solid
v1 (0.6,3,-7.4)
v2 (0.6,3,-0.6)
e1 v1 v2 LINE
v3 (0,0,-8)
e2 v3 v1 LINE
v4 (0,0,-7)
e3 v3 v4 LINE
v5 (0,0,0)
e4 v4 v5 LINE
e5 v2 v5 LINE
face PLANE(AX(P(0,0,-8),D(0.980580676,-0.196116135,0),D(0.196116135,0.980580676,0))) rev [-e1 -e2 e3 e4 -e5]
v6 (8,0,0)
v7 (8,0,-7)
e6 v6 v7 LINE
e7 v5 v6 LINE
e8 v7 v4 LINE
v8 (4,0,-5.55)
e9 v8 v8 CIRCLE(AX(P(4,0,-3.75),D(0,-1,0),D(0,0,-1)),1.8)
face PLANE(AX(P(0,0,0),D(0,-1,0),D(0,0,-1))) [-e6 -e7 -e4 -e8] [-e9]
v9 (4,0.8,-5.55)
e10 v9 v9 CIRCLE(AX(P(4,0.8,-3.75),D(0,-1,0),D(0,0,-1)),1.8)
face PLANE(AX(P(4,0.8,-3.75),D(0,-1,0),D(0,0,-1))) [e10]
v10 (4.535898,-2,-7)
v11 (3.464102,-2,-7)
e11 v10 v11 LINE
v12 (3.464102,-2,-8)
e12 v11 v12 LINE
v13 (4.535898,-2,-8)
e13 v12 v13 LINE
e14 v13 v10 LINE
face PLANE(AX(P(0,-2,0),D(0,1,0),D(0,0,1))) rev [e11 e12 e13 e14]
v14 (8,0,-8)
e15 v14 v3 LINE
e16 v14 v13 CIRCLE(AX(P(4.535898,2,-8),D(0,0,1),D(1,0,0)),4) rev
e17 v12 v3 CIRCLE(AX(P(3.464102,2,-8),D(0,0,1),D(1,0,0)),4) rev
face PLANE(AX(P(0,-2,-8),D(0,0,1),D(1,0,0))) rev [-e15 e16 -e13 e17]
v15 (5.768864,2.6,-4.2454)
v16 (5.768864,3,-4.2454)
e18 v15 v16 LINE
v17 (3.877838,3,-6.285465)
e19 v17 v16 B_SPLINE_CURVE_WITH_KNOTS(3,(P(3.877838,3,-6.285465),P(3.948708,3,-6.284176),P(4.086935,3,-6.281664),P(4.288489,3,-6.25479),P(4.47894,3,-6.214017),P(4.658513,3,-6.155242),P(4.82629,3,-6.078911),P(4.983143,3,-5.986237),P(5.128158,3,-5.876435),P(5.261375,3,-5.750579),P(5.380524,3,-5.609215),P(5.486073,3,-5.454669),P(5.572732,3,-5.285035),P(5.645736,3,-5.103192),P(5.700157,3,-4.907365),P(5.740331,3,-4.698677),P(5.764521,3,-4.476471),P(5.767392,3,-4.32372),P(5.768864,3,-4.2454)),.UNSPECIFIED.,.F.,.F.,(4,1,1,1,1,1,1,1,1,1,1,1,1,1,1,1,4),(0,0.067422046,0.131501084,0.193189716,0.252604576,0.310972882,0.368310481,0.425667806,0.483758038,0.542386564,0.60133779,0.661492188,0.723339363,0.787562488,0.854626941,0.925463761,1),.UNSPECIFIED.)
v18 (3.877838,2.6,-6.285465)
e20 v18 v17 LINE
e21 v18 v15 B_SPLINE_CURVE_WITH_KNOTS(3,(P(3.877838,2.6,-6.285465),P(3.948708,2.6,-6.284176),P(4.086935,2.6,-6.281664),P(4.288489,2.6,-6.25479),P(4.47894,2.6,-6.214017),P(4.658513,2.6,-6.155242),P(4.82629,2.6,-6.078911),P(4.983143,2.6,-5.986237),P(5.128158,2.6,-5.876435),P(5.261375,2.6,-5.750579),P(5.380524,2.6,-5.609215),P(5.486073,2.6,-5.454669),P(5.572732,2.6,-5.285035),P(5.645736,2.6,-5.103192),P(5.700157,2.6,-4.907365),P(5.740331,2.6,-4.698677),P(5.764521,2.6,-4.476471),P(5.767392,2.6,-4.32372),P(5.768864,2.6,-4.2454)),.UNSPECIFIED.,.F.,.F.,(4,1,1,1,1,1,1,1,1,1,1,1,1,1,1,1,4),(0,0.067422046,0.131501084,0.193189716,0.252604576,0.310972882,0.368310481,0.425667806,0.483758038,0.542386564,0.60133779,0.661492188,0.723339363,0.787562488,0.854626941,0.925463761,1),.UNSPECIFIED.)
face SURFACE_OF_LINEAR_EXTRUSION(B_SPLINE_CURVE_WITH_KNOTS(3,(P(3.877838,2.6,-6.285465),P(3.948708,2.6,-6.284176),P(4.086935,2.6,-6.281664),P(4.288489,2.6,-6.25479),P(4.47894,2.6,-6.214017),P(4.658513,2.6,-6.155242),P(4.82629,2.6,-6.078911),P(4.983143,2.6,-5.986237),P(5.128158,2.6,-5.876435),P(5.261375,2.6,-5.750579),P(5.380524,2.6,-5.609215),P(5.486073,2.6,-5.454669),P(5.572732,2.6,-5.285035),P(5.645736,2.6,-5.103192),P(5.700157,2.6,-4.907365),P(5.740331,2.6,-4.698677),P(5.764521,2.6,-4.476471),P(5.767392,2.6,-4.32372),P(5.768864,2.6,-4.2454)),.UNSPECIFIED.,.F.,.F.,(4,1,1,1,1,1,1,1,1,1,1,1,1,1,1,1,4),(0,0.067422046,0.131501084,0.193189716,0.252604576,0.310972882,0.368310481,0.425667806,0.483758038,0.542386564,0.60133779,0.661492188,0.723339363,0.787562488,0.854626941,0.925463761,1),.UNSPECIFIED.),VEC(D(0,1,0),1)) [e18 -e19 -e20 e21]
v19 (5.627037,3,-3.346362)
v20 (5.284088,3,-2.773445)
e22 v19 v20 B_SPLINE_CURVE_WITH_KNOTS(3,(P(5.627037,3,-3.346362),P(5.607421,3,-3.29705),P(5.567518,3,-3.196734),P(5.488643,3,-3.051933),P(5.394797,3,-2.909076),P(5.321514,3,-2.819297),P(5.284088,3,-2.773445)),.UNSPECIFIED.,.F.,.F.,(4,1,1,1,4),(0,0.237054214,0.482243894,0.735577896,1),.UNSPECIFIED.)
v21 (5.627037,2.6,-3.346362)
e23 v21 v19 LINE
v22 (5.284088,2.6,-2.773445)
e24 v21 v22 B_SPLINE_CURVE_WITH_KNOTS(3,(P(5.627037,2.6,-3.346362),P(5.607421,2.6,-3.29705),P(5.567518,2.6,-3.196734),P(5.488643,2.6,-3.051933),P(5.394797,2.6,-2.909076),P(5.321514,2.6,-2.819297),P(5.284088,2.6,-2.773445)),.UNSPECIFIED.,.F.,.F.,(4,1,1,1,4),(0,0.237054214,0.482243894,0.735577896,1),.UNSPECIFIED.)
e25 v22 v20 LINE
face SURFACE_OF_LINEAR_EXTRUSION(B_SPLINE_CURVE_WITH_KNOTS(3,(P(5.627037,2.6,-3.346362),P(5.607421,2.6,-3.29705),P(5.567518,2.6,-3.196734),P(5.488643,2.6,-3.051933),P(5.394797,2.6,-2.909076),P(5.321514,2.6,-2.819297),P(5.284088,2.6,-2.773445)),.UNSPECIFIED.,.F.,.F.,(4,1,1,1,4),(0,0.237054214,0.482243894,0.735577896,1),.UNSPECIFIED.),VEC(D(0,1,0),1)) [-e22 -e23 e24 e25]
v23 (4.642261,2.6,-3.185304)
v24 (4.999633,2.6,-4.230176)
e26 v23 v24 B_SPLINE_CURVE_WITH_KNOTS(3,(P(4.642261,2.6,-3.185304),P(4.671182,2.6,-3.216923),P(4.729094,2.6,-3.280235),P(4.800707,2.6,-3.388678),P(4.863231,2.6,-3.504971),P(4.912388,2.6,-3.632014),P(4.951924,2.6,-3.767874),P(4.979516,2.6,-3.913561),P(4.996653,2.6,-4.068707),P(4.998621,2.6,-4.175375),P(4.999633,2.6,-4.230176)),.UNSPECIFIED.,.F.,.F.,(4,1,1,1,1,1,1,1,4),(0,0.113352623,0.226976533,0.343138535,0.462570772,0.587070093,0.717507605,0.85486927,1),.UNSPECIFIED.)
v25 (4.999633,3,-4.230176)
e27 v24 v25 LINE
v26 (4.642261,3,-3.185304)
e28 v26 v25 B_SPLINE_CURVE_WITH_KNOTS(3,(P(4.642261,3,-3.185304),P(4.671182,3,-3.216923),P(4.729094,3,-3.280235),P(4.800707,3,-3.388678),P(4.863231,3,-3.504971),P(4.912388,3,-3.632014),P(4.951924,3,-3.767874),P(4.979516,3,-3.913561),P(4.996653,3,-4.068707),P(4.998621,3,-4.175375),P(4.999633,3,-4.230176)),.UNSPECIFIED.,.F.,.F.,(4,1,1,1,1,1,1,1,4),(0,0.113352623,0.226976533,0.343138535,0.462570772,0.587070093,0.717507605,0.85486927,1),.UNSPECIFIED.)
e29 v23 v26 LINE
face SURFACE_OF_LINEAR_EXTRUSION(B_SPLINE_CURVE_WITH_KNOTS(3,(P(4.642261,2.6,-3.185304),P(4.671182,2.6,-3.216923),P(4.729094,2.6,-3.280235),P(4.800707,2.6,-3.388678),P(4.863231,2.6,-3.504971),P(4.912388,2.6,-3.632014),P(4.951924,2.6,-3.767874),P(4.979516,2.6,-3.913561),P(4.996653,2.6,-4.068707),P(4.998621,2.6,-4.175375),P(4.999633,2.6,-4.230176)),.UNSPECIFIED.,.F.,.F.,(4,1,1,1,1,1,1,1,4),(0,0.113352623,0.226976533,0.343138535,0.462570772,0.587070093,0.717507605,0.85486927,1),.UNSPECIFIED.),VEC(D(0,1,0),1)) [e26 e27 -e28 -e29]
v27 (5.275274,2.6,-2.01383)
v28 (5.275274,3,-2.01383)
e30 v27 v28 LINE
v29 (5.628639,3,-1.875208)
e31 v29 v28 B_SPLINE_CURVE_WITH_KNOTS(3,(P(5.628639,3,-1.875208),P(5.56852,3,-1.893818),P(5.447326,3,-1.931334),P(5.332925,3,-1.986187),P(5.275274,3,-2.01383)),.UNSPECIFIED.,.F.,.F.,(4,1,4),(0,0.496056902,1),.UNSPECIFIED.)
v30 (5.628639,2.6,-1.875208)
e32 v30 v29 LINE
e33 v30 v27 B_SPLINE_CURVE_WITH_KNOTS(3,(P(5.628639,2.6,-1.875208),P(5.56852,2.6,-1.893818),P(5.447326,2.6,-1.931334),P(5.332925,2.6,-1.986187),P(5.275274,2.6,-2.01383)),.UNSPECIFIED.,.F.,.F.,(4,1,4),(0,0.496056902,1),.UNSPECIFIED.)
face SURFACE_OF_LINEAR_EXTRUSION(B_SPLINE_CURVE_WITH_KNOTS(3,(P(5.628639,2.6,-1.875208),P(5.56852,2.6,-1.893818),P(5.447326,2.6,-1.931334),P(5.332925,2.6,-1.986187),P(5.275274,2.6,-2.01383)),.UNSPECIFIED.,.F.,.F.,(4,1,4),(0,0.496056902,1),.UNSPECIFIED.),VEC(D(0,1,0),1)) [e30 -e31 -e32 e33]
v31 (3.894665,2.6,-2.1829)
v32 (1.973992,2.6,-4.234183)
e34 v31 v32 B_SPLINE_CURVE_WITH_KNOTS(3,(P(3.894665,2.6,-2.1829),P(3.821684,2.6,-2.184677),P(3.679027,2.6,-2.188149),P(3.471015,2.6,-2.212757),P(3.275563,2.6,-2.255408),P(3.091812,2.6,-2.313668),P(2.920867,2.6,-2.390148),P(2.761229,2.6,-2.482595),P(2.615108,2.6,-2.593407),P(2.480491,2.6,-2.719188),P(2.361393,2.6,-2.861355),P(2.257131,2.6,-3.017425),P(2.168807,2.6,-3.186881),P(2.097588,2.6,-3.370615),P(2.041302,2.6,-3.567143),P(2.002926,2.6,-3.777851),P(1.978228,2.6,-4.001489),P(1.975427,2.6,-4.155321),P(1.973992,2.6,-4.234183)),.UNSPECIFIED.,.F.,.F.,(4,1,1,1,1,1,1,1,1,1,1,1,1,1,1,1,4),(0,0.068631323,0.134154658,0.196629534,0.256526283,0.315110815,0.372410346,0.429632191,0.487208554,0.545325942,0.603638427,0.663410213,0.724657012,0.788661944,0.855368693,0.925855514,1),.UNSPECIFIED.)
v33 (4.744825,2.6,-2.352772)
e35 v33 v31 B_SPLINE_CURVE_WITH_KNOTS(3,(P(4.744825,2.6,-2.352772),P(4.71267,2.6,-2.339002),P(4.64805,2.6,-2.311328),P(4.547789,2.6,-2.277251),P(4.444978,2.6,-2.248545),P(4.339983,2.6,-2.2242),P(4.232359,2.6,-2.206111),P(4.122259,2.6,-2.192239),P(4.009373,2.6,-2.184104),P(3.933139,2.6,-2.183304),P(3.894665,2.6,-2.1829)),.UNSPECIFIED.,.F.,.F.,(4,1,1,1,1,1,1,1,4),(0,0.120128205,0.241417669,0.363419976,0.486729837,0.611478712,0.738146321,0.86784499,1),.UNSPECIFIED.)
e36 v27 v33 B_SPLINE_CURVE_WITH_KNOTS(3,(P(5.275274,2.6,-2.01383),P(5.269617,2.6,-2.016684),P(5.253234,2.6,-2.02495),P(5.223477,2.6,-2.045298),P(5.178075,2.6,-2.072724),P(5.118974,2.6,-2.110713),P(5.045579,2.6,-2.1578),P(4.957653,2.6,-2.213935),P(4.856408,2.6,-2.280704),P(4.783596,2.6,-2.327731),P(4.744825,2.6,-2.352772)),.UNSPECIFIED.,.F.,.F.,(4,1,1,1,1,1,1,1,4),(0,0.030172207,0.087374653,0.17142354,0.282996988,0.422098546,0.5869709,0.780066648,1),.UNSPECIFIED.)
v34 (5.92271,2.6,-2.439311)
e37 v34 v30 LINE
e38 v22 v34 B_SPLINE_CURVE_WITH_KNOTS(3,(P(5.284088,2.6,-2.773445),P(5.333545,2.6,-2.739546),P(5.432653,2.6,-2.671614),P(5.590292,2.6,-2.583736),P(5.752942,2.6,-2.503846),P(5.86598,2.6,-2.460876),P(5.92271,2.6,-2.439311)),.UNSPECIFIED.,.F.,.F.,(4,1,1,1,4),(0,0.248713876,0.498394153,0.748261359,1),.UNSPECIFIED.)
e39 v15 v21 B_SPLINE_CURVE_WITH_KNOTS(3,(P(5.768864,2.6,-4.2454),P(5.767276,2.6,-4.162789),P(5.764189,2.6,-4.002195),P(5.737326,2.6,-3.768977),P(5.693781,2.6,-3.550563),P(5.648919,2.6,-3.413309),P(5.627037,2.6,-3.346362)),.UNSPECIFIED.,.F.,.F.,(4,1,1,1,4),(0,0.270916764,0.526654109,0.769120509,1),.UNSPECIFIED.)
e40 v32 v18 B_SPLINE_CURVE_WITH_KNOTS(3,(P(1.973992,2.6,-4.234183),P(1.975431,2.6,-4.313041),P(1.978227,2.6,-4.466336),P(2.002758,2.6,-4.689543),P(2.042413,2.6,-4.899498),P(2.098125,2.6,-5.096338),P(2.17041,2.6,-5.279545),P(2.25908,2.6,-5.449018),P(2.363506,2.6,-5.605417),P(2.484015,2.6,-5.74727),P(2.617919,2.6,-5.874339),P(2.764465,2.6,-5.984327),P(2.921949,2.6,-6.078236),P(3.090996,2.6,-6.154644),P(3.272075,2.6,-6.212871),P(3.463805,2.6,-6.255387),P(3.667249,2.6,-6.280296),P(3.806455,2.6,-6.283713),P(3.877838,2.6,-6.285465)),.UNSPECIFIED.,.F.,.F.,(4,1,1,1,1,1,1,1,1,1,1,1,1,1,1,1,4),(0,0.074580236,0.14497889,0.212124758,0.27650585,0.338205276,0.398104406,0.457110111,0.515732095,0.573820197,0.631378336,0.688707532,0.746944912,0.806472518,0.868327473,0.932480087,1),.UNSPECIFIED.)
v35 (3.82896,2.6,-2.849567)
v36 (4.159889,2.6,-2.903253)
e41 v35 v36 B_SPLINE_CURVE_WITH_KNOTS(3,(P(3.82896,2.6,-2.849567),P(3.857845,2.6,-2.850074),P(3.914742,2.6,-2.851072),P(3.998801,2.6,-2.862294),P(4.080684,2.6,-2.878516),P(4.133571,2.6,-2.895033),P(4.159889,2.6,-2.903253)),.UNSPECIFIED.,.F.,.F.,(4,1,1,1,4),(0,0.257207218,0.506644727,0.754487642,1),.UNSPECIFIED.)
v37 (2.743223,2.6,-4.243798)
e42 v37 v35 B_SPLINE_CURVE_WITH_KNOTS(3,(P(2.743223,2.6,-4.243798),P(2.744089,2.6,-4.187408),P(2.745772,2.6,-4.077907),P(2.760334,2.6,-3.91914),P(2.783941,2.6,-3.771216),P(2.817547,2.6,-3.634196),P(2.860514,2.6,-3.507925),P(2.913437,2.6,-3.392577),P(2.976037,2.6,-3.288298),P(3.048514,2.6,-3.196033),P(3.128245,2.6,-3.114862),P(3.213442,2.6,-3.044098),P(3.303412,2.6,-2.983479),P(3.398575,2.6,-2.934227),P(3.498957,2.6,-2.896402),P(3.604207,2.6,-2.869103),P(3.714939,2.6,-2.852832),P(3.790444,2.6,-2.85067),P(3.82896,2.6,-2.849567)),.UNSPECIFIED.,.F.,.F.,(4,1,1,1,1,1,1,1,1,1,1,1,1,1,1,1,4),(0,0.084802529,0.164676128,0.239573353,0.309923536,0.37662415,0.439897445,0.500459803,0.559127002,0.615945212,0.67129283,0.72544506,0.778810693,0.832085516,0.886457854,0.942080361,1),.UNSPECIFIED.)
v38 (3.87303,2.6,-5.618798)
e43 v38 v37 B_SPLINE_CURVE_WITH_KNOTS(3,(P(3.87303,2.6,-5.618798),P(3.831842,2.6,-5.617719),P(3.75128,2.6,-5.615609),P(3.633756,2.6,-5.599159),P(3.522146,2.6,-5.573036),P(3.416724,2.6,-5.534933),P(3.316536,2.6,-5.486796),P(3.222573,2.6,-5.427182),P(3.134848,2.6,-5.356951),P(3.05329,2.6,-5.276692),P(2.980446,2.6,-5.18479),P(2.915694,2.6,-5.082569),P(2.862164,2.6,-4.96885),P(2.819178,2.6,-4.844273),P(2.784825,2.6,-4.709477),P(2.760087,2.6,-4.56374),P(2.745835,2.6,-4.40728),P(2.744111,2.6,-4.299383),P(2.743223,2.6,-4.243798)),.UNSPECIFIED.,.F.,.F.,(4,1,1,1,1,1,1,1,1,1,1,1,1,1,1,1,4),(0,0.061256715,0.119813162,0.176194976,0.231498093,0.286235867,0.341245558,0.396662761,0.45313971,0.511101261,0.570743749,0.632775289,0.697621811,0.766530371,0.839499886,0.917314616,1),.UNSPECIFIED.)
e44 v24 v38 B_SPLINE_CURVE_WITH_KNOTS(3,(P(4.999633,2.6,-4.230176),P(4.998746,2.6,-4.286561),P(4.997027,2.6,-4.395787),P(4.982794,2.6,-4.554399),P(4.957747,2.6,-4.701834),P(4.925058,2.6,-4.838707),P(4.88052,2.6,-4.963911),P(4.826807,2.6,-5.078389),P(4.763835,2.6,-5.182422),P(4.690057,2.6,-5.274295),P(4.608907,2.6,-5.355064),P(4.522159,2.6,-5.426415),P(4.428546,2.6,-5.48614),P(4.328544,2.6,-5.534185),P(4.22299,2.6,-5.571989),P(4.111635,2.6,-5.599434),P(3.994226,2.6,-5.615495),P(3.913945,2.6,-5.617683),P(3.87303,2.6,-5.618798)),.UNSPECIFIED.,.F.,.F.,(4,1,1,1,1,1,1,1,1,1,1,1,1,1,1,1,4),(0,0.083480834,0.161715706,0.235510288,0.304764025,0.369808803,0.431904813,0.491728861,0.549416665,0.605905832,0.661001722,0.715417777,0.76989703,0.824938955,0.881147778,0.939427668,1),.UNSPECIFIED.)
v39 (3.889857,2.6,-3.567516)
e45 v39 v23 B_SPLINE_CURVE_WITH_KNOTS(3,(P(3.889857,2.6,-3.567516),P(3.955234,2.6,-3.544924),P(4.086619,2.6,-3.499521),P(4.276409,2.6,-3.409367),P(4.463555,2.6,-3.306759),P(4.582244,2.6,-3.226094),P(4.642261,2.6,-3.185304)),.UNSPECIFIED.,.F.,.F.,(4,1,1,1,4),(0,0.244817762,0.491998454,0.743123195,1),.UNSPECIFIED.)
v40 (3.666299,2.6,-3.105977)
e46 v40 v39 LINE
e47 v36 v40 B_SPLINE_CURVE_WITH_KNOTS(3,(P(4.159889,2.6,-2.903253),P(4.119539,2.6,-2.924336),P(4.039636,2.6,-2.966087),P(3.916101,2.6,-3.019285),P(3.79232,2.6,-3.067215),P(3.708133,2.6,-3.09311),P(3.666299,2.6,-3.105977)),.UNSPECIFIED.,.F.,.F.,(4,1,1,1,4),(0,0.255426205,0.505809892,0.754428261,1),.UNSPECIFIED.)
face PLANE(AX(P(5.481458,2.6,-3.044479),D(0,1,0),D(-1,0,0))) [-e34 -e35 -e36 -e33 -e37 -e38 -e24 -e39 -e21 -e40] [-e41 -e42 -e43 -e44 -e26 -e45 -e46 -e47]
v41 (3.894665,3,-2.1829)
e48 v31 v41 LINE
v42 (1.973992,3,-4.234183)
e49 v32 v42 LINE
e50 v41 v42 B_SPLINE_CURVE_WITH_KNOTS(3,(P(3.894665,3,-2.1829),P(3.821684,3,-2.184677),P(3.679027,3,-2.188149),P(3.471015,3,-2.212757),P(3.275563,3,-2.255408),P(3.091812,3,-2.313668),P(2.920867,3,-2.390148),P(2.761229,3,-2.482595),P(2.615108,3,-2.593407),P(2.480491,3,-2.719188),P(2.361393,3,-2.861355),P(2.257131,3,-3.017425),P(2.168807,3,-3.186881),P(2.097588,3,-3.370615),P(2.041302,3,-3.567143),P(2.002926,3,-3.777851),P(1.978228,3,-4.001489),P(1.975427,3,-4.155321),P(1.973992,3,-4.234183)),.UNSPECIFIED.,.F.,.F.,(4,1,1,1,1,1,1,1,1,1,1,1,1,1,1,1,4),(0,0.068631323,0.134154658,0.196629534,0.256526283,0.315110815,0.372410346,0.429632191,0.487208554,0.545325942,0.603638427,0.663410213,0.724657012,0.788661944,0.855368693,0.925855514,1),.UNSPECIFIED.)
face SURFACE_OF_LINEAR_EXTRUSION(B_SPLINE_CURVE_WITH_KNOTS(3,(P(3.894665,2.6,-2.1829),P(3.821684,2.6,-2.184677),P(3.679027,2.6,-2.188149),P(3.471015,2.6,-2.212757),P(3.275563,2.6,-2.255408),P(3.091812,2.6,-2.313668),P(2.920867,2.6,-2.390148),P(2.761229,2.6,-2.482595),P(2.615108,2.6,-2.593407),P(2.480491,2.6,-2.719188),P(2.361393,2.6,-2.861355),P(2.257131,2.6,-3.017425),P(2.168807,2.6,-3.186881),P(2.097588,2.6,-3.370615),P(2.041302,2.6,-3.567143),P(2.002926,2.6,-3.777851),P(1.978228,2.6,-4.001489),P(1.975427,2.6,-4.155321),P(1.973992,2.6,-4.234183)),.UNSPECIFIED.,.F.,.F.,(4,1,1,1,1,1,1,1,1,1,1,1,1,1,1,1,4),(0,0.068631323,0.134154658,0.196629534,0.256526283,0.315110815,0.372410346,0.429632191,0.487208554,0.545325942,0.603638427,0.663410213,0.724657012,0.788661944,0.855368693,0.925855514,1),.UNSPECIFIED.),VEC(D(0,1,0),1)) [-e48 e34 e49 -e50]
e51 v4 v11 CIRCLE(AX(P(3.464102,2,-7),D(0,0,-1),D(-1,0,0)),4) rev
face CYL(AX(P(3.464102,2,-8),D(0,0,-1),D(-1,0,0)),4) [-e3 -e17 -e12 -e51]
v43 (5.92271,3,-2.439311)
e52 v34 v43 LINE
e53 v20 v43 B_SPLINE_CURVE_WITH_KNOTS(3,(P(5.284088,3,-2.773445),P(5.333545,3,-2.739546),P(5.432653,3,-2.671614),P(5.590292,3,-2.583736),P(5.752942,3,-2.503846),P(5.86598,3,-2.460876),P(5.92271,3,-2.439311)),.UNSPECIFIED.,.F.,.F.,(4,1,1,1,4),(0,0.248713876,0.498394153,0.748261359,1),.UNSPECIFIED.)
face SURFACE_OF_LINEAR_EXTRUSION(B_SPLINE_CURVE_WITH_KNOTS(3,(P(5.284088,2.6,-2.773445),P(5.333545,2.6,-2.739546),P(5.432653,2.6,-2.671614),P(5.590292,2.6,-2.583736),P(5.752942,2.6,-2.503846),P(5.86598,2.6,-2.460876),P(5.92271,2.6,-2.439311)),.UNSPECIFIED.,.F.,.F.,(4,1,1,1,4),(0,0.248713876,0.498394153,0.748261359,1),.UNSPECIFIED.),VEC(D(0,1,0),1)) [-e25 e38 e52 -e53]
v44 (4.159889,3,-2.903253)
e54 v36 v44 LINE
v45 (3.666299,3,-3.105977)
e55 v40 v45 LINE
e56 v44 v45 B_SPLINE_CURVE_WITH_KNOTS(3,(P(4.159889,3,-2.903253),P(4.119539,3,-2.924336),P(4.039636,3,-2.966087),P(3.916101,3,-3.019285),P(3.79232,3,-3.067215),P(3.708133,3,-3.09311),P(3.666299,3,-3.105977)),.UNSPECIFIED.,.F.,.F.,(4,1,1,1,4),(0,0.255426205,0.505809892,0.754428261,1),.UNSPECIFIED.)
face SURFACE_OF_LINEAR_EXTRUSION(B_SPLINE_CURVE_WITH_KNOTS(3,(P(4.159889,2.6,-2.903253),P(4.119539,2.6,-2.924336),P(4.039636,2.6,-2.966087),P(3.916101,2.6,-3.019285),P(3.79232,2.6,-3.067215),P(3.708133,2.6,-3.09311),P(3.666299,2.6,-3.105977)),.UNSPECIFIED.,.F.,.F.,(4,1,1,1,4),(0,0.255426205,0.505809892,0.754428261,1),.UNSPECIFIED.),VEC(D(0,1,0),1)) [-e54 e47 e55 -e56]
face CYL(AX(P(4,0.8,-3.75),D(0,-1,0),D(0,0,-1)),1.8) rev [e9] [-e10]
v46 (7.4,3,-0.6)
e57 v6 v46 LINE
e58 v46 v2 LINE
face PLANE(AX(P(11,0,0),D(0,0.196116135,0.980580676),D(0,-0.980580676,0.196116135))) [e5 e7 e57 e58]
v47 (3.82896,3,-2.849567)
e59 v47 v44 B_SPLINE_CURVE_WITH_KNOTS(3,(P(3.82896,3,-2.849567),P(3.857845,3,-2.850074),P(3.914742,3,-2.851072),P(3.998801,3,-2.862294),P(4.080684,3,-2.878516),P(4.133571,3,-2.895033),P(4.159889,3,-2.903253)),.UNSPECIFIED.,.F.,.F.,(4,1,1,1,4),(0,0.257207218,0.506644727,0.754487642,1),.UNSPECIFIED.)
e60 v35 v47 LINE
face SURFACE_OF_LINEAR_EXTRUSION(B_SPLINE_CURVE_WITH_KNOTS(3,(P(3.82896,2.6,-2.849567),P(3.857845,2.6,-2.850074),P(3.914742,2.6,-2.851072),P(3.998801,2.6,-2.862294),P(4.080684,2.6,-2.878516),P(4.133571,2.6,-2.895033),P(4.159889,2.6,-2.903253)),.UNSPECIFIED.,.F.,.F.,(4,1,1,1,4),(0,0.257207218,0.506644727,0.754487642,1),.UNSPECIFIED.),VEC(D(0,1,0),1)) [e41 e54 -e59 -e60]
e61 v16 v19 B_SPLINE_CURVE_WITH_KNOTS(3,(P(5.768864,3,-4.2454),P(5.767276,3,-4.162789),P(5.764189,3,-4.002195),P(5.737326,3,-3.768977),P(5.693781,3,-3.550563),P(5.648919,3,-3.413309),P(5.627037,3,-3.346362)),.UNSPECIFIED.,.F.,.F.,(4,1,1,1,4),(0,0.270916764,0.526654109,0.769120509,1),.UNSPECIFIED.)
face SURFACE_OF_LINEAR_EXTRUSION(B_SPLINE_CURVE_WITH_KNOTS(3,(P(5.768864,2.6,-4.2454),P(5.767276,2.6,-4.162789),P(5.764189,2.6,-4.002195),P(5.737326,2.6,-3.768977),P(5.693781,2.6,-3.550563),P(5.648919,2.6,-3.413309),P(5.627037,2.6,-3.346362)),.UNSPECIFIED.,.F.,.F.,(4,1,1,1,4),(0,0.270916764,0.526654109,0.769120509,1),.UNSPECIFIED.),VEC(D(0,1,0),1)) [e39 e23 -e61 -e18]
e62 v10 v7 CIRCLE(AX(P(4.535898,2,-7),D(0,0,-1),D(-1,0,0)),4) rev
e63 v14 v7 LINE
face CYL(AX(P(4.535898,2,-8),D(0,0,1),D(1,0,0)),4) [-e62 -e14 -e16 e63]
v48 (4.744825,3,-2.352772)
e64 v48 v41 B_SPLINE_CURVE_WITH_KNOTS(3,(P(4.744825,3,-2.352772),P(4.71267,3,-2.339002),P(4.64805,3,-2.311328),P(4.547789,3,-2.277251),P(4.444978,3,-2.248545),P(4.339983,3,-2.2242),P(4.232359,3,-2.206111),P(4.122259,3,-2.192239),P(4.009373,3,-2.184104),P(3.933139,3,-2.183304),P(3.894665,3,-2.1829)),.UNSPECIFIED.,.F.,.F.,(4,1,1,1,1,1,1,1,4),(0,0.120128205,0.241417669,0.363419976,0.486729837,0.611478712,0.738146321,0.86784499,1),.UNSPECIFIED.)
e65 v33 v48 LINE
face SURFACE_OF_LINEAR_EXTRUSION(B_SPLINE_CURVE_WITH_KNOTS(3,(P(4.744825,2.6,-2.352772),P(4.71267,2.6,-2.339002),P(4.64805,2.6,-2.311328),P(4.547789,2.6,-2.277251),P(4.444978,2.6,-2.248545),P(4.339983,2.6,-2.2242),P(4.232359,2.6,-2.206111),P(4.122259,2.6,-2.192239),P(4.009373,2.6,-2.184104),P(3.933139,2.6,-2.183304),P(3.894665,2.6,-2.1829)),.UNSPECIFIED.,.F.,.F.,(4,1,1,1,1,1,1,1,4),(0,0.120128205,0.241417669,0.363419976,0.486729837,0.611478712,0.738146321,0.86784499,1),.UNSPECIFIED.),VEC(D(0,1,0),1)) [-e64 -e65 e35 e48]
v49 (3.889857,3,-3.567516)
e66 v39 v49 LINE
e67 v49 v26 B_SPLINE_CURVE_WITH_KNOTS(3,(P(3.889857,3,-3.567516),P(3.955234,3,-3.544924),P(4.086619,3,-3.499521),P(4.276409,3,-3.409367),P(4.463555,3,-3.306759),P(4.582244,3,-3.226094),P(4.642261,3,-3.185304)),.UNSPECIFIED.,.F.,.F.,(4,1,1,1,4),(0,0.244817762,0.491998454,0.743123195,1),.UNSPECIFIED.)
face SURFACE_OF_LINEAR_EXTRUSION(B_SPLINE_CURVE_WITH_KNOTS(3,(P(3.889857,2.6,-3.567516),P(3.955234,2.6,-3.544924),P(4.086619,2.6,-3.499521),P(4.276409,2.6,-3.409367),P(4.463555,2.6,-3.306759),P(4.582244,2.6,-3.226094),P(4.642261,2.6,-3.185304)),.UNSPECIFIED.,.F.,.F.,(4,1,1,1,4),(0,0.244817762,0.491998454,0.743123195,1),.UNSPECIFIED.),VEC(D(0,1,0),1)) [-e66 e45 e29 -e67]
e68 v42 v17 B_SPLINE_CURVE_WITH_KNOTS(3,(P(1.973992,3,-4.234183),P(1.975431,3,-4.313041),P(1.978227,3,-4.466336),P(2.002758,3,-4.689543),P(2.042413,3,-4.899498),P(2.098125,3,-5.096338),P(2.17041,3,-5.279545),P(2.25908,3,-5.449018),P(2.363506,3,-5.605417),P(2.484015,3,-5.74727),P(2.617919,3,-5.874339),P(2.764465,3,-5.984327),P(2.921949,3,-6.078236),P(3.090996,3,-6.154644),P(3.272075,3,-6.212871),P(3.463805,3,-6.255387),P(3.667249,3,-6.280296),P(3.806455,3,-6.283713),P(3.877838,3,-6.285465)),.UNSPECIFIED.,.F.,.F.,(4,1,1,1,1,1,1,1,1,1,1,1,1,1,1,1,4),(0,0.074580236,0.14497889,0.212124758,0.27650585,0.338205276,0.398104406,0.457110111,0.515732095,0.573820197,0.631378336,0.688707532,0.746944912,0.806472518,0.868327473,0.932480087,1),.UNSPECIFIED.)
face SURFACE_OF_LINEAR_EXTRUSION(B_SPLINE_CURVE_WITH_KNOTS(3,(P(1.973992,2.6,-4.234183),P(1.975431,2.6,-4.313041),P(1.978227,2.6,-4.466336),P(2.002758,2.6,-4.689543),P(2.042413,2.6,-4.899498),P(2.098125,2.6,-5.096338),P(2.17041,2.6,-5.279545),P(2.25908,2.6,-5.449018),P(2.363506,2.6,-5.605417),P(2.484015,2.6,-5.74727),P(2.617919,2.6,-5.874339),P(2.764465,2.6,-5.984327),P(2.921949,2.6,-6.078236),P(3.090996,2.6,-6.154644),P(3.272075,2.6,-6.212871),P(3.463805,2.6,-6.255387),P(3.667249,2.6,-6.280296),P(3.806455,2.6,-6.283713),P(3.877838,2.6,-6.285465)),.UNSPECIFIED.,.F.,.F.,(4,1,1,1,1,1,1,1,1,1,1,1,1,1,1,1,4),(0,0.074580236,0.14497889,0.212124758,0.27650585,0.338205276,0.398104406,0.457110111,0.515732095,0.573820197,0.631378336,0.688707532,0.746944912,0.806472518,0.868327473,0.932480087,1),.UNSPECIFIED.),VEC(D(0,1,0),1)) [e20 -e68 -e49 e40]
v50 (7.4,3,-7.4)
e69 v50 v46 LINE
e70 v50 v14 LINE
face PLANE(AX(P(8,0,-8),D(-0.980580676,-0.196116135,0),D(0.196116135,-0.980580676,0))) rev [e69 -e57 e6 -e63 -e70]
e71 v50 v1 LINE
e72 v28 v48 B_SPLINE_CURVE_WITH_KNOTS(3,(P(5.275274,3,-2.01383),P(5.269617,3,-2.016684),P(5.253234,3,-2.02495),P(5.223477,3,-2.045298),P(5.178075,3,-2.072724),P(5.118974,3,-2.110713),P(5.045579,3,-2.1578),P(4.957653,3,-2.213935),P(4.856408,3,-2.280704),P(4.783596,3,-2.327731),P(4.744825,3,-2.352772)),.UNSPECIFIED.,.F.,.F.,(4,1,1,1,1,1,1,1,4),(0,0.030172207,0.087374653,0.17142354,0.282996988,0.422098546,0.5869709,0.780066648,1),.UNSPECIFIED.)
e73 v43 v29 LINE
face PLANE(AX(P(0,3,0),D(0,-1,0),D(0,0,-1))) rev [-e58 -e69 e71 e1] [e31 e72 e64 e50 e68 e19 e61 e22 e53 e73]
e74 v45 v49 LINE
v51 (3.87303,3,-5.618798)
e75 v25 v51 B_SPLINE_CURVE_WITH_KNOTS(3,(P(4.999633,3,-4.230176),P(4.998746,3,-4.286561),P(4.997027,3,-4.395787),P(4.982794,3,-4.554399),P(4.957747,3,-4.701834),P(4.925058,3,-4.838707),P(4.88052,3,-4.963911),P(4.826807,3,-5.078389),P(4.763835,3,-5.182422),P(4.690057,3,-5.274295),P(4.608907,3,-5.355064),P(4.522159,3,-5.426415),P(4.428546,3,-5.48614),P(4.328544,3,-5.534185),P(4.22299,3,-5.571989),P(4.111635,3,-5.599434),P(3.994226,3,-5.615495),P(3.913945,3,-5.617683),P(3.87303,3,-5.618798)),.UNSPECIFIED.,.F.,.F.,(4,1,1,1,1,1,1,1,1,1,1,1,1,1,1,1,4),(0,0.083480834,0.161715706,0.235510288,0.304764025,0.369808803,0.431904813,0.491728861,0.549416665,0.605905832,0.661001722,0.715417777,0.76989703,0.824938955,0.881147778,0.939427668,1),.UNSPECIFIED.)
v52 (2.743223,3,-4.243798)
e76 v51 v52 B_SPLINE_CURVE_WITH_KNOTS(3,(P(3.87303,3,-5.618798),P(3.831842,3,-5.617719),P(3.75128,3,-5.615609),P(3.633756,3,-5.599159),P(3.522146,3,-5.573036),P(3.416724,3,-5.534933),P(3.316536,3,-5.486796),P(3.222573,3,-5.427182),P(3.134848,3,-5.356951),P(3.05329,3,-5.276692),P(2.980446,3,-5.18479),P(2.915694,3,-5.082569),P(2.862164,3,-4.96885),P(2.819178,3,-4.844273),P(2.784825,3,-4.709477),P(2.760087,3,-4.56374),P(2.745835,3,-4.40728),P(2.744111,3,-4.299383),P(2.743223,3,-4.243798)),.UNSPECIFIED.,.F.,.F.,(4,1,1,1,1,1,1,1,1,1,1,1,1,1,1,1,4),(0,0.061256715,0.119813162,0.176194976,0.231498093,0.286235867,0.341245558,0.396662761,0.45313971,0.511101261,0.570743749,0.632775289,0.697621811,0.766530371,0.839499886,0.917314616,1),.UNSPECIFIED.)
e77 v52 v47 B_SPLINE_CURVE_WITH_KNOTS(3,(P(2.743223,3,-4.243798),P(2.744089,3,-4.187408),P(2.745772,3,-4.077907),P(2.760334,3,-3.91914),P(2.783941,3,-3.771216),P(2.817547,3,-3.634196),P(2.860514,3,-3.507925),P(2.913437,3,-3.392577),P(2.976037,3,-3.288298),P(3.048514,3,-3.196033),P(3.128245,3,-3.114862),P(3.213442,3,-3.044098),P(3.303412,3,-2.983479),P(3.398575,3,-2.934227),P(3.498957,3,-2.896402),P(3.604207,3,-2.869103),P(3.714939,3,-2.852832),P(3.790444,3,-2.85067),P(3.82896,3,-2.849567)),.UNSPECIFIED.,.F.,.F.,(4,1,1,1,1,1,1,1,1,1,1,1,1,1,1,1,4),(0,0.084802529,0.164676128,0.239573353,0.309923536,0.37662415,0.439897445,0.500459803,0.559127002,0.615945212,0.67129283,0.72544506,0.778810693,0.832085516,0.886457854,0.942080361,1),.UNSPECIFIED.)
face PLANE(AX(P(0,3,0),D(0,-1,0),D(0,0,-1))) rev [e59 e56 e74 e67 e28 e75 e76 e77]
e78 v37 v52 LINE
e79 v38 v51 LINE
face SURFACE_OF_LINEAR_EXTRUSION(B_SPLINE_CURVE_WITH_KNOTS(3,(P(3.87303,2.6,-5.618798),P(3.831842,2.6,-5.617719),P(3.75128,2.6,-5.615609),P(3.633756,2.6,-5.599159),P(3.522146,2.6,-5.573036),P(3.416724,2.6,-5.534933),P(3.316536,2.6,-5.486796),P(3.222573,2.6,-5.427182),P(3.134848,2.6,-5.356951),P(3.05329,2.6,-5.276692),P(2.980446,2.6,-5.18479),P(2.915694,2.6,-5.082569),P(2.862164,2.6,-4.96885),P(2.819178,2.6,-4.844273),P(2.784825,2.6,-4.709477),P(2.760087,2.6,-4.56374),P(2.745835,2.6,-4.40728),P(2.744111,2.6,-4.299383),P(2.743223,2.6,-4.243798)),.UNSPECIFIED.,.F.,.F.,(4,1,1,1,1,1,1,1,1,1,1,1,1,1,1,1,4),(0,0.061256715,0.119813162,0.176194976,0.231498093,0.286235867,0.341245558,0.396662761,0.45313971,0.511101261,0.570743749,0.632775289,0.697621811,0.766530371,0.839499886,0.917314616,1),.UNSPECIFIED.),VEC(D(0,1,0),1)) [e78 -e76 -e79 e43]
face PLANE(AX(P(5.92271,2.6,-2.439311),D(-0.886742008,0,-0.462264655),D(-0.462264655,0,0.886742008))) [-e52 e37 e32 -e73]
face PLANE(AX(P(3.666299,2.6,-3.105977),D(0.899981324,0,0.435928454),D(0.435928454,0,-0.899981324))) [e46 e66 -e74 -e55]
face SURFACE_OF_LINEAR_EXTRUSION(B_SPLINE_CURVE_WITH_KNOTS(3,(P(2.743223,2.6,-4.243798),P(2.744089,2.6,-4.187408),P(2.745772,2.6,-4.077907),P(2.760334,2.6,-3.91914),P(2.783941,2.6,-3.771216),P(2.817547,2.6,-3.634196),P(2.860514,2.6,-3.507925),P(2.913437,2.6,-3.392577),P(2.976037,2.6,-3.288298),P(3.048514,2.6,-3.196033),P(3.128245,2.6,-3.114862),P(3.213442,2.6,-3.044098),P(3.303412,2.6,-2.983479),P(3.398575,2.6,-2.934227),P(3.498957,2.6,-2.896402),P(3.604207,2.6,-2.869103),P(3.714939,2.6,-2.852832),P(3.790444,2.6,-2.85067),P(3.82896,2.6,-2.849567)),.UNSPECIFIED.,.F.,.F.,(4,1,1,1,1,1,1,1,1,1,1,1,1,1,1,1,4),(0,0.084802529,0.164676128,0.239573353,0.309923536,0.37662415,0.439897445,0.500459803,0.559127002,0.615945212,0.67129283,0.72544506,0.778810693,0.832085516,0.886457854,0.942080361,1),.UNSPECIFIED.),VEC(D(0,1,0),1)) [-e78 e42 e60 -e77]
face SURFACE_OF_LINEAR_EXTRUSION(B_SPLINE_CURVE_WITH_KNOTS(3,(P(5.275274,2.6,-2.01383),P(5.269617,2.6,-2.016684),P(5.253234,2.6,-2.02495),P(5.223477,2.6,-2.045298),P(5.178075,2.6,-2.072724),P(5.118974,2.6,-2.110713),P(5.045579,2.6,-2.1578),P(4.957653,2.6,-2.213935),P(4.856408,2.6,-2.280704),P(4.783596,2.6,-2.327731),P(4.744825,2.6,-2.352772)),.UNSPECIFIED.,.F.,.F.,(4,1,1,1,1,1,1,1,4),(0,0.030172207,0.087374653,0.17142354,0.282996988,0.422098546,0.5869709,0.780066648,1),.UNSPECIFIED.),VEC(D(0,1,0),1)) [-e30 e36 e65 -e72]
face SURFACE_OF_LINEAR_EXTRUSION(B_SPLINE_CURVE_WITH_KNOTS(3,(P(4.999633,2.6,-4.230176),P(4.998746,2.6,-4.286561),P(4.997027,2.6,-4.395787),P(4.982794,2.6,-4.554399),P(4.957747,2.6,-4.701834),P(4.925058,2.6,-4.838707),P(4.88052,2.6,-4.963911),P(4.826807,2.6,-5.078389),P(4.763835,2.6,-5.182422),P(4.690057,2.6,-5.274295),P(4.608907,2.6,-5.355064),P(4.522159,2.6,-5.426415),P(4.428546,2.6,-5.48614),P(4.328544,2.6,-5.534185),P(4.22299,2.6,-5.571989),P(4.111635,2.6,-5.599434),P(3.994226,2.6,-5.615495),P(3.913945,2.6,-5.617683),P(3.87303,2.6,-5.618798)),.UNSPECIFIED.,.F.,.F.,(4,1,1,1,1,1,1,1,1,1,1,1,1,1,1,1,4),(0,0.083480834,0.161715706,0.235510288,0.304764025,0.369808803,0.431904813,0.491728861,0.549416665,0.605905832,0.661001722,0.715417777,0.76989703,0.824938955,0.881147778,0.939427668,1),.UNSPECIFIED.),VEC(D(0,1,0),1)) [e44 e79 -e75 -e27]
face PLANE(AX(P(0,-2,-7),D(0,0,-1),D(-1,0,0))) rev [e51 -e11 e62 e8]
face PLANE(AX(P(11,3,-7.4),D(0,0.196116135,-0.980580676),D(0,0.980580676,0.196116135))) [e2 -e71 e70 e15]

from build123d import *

# Parameters (mm, degrees)
SKETCH1_W               = 8
SKETCH1_H               = 8
BOSS_EXTRUDE1_DEPTH     = 3
CUT_EXTRUDE1_DEPTH      = 12.704699911
CUT_EXTRUDE1_DEPTH_BACK = 12.704699911
CUT_EXTRUDE2_DEPTH      = 11
SKETCH4_R               = 1.8
CUT_EXTRUDE3_DEPTH      = 0.8
SKETCH5_W               = 8
SKETCH5_H               = 1
BOSS_EXTRUDE2_DEPTH     = 2
FILLET1_R               = 4
CUT_EXTRUDE4_DEPTH      = 0.4


with BuildPart() as part:
    # Sketch1 → Boss-Extrude1 (new body)
    with BuildSketch(Plane(origin=(0, 0, 0), x_dir=(1, 0, 0), z_dir=(0, 1, 0))):
        with Locations((4, 4)):
            Rectangle(SKETCH1_W, SKETCH1_H)
    extrude(amount=BOSS_EXTRUDE1_DEPTH)

    # Sketch2 → Cut-Extrude1 (cut, two sides: drawn at the far end of the back side and taken through both)
    with BuildSketch(Plane.XY.offset(-CUT_EXTRUDE1_DEPTH_BACK)):
        Polygon((0, 0), (0.6, 3), (0, 3), align=None)
        Polygon((8, 0), (7.4, 3), (8, 3), align=None)
    extrude(amount=CUT_EXTRUDE1_DEPTH + CUT_EXTRUDE1_DEPTH_BACK, mode=Mode.SUBTRACT)

    # Sketch3 → Cut-Extrude2 (cut)
    with BuildSketch(Plane(origin=(0, 0, 0), x_dir=(0, 0, -1), z_dir=(1, 0, 0))):
        Polygon((0, 0), (0.6, 3), (0, 3), align=None)
        Polygon((8, 3), (7.4, 3), (8, 0), align=None)
    extrude(amount=CUT_EXTRUDE2_DEPTH, mode=Mode.SUBTRACT)

    # Sketch4 → Cut-Extrude3 (cut)
    with BuildSketch(Plane.XZ):
        with Locations(Location((4, -3.75, 0), (0, 0, 270))):
            Circle(SKETCH4_R)
    extrude(amount=-CUT_EXTRUDE3_DEPTH, mode=Mode.SUBTRACT)

    # Sketch5 → Boss-Extrude2 (add)
    with BuildSketch(Plane.XZ):
        with Locations((4, -7.5)):
            Rectangle(SKETCH5_W, SKETCH5_H)
    extrude(amount=BOSS_EXTRUDE2_DEPTH)

    # Fillet1
    # the kernel refuses this fillet: 4 mm, written as the material it takes off along each edge
    with BuildSketch(Plane(origin=(8, -2, -16.660254038), x_dir=(0, 1, 0), z_dir=(0, 0, 1)), Plane(origin=(0, -2, 1.660254038), x_dir=(0, 1, 0), z_dir=(0, 0, -1))) as fillet1_piece_1:
        with BuildLine():
            CenterArc((4, 3.464101615), FILLET1_R, 180, 60)
            Line((0, 3.464101615), (-0.08, 3.464101615))
            Line((-0.08, 3.464101615), (-0.08, 0))
            Line((-0.08, 0), (0, -0.08))
            ThreePointArc((0, -0.08), (1, -0.08), (1.96, -0.069282032))
            Line((1.96, -0.069282032), (2, 0))
        make_face()
    extrude(amount=18.320508076, mode=Mode.SUBTRACT)

    # Sketch6 → Cut-Extrude4 (cut)
    with BuildSketch(Plane(origin=(0, 3, 0), x_dir=(1, 0, 0), z_dir=(0, 1, 0))):
        with BuildLine():
            add(Edge.make_bspline(
                [(5.284087955, 2.773445367), (5.333545491, 2.739545524), (5.432652736, 2.671614118), (5.590291823, 2.583736248), (5.752942084, 2.503846486), (5.865979951, 2.460876102), (5.92270975, 2.439310751)],
                knots=[0, 0, 0, 0, 0.994855506, 1.99357661, 2.993045438, 4, 4, 4, 4], degree=3))
            Line((5.92270975, 2.439310751), (5.628639237, 1.875208187))
            add(Edge.make_bspline(
                [(5.628639237, 1.875208187), (5.568520037, 1.893818156), (5.447325875, 1.93133395), (5.332925255, 1.986187111), (5.275273852, 2.013829982)],
                knots=[0, 0, 0, 0, 0.992113803, 2, 2, 2, 2], degree=3))
            add(Edge.make_bspline(
                [(5.275273852, 2.013829982), (5.26961656, 2.016684314), (5.253233801, 2.024950075), (5.223476786, 2.045298413), (5.178074812, 2.072724498), (5.118973761, 2.11071311), (5.045578888, 2.157800121), (4.95765273, 2.213934729), (4.856407872, 2.280704114), (4.783596416, 2.327731001), (4.744825134, 2.35277229)],
                knots=[0, 0, 0, 0, 0.241377655, 0.698997227, 1.371388316, 2.263975901, 3.376788369, 4.695767198, 6.240533187, 8, 8, 8, 8], degree=3))
            add(Edge.make_bspline(
                [(4.744825134, 2.35277229), (4.712670389, 2.339001865), (4.648050063, 2.311327899), (4.547788838, 2.27725121), (4.444978029, 2.248544986), (4.339982896, 2.224200245), (4.232359046, 2.206111381), (4.122258624, 2.192239309), (4.00937299, 2.18410397), (3.933139287, 2.183304154), (3.894664878, 2.182900495)],
                knots=[0, 0, 0, 0, 0.961025642, 1.931341354, 2.907359807, 3.893838693, 4.891829695, 5.905170566, 6.942759923, 8, 8, 8, 8], degree=3))
            add(Edge.make_bspline(
                [(3.894664878, 2.182900495), (3.821683976, 2.184676763), (3.679027131, 2.188148859), (3.471015208, 2.212756542), (3.275562804, 2.255408477), (3.091812023, 2.313667662), (2.920867424, 2.390147666), (2.761229426, 2.482594503), (2.615108223, 2.593406711), (2.480490537, 2.71918809), (2.361392609, 2.861354588), (2.257130725, 3.017424584), (2.168806746, 3.186880722), (2.097587685, 3.370615377), (2.041301668, 3.567142879), (2.002926315, 3.777850586), (1.978227581, 4.001488849), (1.975427333, 4.155321196), (1.973991801, 4.234182546)],
                knots=[0, 0, 0, 0, 1.098101164, 2.146474535, 3.146072545, 4.104420533, 5.041773038, 5.958565538, 6.874115049, 7.795336865, 8.725215067, 9.658214839, 10.614563411, 11.594512188, 12.618591104, 13.685899083, 14.813688224, 16, 16, 16, 16], degree=3))
            add(Edge.make_bspline(
                [(1.973991801, 4.234182546), (1.97543059, 4.313040679), (1.978227497, 4.466335509), (2.002757559, 4.689542909), (2.042412611, 4.899497801), (2.098124704, 5.096337583), (2.170410456, 5.279545107), (2.259079723, 5.449017762), (2.363505524, 5.605417057), (2.484015277, 5.747270094), (2.617919267, 5.874338646), (2.764464989, 5.984327234), (2.9219486, 6.078236158), (3.090996271, 6.154643933), (3.272074664, 6.212871015), (3.463805003, 6.255387163), (3.667248709, 6.280295733), (3.806454886, 6.283712517), (3.877837955, 6.285464598)],
                knots=[0, 0, 0, 0, 1.193283781, 2.319662245, 3.393996131, 4.424093603, 5.411284417, 6.369670503, 7.313761776, 8.251713527, 9.181123148, 10.102053383, 11.01932051, 11.951118596, 12.903560284, 13.893239571, 14.919681386, 16, 16, 16, 16], degree=3))
            add(Edge.make_bspline(
                [(3.877837955, 6.285464598), (3.948708316, 6.284176334), (4.086935049, 6.281663683), (4.288489067, 6.254790298), (4.478939684, 6.214016744), (4.658513444, 6.155241629), (4.826290277, 6.078911265), (4.983143341, 5.98623667), (5.128157857, 5.876434989), (5.26137487, 5.750578969), (5.380523981, 5.609215368), (5.486073462, 5.454669187), (5.572731816, 5.285035211), (5.645736122, 5.103191508), (5.700157026, 4.90736457), (5.740330715, 4.69867705), (5.764520815, 4.476471411), (5.76739165, 4.323719862), (5.768863596, 4.245400495)],
                knots=[0, 0, 0, 0, 1.078752742, 2.104017338, 3.091035458, 4.041673215, 4.975566109, 5.892967701, 6.810684895, 7.740128604, 8.678185021, 9.621404646, 10.583875016, 11.573429805, 12.6009998, 13.674031063, 14.80742018, 16, 16, 16, 16], degree=3))
            add(Edge.make_bspline(
                [(5.768863596, 4.245400495), (5.767275795, 4.16278925), (5.764189157, 4.002195454), (5.737326284, 3.768977018), (5.693780668, 3.550562854), (5.648918616, 3.41330904), (5.627036673, 3.346362034)],
                knots=[0, 0, 0, 0, 1.083667057, 2.106616435, 3.076482036, 4, 4, 4, 4], degree=3))
            add(Edge.make_bspline(
                [(5.627036673, 3.346362034), (5.607421404, 3.297050064), (5.567517691, 3.196733787), (5.488642668, 3.051933408), (5.394797316, 2.909076479), (5.321514211, 2.819296637), (5.284087955, 2.773445367)],
                knots=[0, 0, 0, 0, 0.948216854, 1.928975575, 2.942311585, 4, 4, 4, 4], degree=3))
        make_face()
        with BuildLine():
            add(Edge.make_bspline(
                [(4.642261032, 3.185304341), (4.671182259, 3.216922768), (4.72909393, 3.280235293), (4.800707281, 3.388678336), (4.863230922, 3.50497094), (4.912388312, 3.632014464), (4.951923574, 3.76787431), (4.97951585, 3.913560578), (4.996652709, 4.068707035), (4.998621406, 4.175375245), (4.999632827, 4.230176136)],
                knots=[0, 0, 0, 0, 0.906820982, 1.815812261, 2.745108282, 3.70056618, 4.696560745, 5.740060838, 6.83895416, 8, 8, 8, 8], degree=3))
            add(Edge.make_bspline(
                [(4.999632827, 4.230176136), (4.998745764, 4.286560817), (4.997027382, 4.395786947), (4.982794262, 4.554398979), (4.957747484, 4.70183414), (4.925058455, 4.838707416), (4.88052022, 4.963910999), (4.826807351, 5.078388614), (4.763835344, 5.182421929), (4.690056733, 5.274294514), (4.608907177, 5.355063587), (4.522159409, 5.426414517), (4.428546166, 5.486139657), (4.328544236, 5.534184829), (4.222990468, 5.571989212), (4.111634776, 5.59943433), (3.994225982, 5.615495039), (3.913944994, 5.6176829), (3.873030263, 5.618797931)],
                knots=[0, 0, 0, 0, 1.335693338, 2.587451293, 3.768164612, 4.876224393, 5.916940853, 6.910477009, 7.867661778, 8.790666633, 9.694493319, 10.576027549, 11.446684429, 12.318352473, 13.199023277, 14.098364444, 15.030842682, 16, 16, 16, 16], degree=3))
            add(Edge.make_bspline(
                [(3.873030263, 5.618797931), (3.831841607, 5.617719084), (3.751279942, 5.615608947), (3.633755604, 5.599158788), (3.522145798, 5.573035665), (3.416723766, 5.534932642), (3.316536446, 5.486796326), (3.222573421, 5.427181815), (3.134847786, 5.356951252), (3.053289548, 5.276692152), (2.980446173, 5.184790487), (2.915694165, 5.082568667), (2.862164439, 4.968850144), (2.819178201, 4.84427298), (2.784825228, 4.709477379), (2.760087026, 4.563739976), (2.745835322, 4.407279692), (2.744110931, 4.299383286), (2.74322257, 4.243797931)],
                knots=[0, 0, 0, 0, 0.980107447, 1.917010591, 2.819119613, 3.703969481, 4.579773866, 5.459928929, 6.346604172, 7.250235365, 8.177620171, 9.131899985, 10.124404622, 11.161948974, 12.264485933, 13.431998172, 14.677033863, 16, 16, 16, 16], degree=3))
            add(Edge.make_bspline(
                [(2.74322257, 4.243797931), (2.744089067, 4.187408458), (2.745771696, 4.077907007), (2.760333697, 3.91913972), (2.783941374, 3.771215716), (2.817547327, 3.634196218), (2.86051391, 3.507924697), (2.913437174, 3.392577112), (2.976036542, 3.288297709), (3.048513511, 3.196032652), (3.128245057, 3.114861766), (3.213441608, 3.04409835), (3.303411645, 2.983479498), (3.39857486, 2.934226809), (3.498956775, 2.896402137), (3.604207339, 2.869103357), (3.714939061, 2.852831885), (3.790443662, 2.850669982), (3.82895975, 2.849567162)],
                knots=[0, 0, 0, 0, 1.356840463, 2.634818045, 3.833173645, 4.958776583, 6.025986406, 7.038359119, 8.007356852, 8.946032033, 9.855123386, 10.740685277, 11.607120956, 12.460971081, 13.313368256, 14.183325659, 15.073285775, 16, 16, 16, 16], degree=3))
            add(Edge.make_bspline(
                [(3.82895975, 2.849567162), (3.857844622, 2.850073951), (3.914741814, 2.851072222), (3.998801079, 2.862293633), (4.080683558, 2.878515583), (4.133570622, 2.895033243), (4.159889237, 2.903253059)],
                knots=[0, 0, 0, 0, 1.028828871, 2.026578908, 3.017950568, 4, 4, 4, 4], degree=3))
            add(Edge.make_bspline(
                [(4.159889237, 2.903253059), (4.119539232, 2.924336443), (4.039635796, 2.966086993), (3.916101198, 3.019284802), (3.792319766, 3.067214804), (3.708133251, 3.09310976), (3.666299493, 3.105977418)],
                knots=[0, 0, 0, 0, 1.021704821, 2.023239566, 3.017713044, 4, 4, 4, 4], degree=3))
            Line((3.666299493, 3.105977418), (3.889857186, 3.56751588))
            add(Edge.make_bspline(
                [(3.889857186, 3.56751588), (3.955233958, 3.544923565), (4.086618506, 3.49952088), (4.276409331, 3.409366748), (4.463555304, 3.306758821), (4.582244486, 3.226093623), (4.642261032, 3.185304341)],
                knots=[0, 0, 0, 0, 0.979271047, 1.967993817, 2.972492781, 4, 4, 4, 4], degree=3))
        make_face(mode=Mode.SUBTRACT)
    extrude(amount=-CUT_EXTRUDE4_DEPTH, mode=Mode.SUBTRACT)


solid = part.part
